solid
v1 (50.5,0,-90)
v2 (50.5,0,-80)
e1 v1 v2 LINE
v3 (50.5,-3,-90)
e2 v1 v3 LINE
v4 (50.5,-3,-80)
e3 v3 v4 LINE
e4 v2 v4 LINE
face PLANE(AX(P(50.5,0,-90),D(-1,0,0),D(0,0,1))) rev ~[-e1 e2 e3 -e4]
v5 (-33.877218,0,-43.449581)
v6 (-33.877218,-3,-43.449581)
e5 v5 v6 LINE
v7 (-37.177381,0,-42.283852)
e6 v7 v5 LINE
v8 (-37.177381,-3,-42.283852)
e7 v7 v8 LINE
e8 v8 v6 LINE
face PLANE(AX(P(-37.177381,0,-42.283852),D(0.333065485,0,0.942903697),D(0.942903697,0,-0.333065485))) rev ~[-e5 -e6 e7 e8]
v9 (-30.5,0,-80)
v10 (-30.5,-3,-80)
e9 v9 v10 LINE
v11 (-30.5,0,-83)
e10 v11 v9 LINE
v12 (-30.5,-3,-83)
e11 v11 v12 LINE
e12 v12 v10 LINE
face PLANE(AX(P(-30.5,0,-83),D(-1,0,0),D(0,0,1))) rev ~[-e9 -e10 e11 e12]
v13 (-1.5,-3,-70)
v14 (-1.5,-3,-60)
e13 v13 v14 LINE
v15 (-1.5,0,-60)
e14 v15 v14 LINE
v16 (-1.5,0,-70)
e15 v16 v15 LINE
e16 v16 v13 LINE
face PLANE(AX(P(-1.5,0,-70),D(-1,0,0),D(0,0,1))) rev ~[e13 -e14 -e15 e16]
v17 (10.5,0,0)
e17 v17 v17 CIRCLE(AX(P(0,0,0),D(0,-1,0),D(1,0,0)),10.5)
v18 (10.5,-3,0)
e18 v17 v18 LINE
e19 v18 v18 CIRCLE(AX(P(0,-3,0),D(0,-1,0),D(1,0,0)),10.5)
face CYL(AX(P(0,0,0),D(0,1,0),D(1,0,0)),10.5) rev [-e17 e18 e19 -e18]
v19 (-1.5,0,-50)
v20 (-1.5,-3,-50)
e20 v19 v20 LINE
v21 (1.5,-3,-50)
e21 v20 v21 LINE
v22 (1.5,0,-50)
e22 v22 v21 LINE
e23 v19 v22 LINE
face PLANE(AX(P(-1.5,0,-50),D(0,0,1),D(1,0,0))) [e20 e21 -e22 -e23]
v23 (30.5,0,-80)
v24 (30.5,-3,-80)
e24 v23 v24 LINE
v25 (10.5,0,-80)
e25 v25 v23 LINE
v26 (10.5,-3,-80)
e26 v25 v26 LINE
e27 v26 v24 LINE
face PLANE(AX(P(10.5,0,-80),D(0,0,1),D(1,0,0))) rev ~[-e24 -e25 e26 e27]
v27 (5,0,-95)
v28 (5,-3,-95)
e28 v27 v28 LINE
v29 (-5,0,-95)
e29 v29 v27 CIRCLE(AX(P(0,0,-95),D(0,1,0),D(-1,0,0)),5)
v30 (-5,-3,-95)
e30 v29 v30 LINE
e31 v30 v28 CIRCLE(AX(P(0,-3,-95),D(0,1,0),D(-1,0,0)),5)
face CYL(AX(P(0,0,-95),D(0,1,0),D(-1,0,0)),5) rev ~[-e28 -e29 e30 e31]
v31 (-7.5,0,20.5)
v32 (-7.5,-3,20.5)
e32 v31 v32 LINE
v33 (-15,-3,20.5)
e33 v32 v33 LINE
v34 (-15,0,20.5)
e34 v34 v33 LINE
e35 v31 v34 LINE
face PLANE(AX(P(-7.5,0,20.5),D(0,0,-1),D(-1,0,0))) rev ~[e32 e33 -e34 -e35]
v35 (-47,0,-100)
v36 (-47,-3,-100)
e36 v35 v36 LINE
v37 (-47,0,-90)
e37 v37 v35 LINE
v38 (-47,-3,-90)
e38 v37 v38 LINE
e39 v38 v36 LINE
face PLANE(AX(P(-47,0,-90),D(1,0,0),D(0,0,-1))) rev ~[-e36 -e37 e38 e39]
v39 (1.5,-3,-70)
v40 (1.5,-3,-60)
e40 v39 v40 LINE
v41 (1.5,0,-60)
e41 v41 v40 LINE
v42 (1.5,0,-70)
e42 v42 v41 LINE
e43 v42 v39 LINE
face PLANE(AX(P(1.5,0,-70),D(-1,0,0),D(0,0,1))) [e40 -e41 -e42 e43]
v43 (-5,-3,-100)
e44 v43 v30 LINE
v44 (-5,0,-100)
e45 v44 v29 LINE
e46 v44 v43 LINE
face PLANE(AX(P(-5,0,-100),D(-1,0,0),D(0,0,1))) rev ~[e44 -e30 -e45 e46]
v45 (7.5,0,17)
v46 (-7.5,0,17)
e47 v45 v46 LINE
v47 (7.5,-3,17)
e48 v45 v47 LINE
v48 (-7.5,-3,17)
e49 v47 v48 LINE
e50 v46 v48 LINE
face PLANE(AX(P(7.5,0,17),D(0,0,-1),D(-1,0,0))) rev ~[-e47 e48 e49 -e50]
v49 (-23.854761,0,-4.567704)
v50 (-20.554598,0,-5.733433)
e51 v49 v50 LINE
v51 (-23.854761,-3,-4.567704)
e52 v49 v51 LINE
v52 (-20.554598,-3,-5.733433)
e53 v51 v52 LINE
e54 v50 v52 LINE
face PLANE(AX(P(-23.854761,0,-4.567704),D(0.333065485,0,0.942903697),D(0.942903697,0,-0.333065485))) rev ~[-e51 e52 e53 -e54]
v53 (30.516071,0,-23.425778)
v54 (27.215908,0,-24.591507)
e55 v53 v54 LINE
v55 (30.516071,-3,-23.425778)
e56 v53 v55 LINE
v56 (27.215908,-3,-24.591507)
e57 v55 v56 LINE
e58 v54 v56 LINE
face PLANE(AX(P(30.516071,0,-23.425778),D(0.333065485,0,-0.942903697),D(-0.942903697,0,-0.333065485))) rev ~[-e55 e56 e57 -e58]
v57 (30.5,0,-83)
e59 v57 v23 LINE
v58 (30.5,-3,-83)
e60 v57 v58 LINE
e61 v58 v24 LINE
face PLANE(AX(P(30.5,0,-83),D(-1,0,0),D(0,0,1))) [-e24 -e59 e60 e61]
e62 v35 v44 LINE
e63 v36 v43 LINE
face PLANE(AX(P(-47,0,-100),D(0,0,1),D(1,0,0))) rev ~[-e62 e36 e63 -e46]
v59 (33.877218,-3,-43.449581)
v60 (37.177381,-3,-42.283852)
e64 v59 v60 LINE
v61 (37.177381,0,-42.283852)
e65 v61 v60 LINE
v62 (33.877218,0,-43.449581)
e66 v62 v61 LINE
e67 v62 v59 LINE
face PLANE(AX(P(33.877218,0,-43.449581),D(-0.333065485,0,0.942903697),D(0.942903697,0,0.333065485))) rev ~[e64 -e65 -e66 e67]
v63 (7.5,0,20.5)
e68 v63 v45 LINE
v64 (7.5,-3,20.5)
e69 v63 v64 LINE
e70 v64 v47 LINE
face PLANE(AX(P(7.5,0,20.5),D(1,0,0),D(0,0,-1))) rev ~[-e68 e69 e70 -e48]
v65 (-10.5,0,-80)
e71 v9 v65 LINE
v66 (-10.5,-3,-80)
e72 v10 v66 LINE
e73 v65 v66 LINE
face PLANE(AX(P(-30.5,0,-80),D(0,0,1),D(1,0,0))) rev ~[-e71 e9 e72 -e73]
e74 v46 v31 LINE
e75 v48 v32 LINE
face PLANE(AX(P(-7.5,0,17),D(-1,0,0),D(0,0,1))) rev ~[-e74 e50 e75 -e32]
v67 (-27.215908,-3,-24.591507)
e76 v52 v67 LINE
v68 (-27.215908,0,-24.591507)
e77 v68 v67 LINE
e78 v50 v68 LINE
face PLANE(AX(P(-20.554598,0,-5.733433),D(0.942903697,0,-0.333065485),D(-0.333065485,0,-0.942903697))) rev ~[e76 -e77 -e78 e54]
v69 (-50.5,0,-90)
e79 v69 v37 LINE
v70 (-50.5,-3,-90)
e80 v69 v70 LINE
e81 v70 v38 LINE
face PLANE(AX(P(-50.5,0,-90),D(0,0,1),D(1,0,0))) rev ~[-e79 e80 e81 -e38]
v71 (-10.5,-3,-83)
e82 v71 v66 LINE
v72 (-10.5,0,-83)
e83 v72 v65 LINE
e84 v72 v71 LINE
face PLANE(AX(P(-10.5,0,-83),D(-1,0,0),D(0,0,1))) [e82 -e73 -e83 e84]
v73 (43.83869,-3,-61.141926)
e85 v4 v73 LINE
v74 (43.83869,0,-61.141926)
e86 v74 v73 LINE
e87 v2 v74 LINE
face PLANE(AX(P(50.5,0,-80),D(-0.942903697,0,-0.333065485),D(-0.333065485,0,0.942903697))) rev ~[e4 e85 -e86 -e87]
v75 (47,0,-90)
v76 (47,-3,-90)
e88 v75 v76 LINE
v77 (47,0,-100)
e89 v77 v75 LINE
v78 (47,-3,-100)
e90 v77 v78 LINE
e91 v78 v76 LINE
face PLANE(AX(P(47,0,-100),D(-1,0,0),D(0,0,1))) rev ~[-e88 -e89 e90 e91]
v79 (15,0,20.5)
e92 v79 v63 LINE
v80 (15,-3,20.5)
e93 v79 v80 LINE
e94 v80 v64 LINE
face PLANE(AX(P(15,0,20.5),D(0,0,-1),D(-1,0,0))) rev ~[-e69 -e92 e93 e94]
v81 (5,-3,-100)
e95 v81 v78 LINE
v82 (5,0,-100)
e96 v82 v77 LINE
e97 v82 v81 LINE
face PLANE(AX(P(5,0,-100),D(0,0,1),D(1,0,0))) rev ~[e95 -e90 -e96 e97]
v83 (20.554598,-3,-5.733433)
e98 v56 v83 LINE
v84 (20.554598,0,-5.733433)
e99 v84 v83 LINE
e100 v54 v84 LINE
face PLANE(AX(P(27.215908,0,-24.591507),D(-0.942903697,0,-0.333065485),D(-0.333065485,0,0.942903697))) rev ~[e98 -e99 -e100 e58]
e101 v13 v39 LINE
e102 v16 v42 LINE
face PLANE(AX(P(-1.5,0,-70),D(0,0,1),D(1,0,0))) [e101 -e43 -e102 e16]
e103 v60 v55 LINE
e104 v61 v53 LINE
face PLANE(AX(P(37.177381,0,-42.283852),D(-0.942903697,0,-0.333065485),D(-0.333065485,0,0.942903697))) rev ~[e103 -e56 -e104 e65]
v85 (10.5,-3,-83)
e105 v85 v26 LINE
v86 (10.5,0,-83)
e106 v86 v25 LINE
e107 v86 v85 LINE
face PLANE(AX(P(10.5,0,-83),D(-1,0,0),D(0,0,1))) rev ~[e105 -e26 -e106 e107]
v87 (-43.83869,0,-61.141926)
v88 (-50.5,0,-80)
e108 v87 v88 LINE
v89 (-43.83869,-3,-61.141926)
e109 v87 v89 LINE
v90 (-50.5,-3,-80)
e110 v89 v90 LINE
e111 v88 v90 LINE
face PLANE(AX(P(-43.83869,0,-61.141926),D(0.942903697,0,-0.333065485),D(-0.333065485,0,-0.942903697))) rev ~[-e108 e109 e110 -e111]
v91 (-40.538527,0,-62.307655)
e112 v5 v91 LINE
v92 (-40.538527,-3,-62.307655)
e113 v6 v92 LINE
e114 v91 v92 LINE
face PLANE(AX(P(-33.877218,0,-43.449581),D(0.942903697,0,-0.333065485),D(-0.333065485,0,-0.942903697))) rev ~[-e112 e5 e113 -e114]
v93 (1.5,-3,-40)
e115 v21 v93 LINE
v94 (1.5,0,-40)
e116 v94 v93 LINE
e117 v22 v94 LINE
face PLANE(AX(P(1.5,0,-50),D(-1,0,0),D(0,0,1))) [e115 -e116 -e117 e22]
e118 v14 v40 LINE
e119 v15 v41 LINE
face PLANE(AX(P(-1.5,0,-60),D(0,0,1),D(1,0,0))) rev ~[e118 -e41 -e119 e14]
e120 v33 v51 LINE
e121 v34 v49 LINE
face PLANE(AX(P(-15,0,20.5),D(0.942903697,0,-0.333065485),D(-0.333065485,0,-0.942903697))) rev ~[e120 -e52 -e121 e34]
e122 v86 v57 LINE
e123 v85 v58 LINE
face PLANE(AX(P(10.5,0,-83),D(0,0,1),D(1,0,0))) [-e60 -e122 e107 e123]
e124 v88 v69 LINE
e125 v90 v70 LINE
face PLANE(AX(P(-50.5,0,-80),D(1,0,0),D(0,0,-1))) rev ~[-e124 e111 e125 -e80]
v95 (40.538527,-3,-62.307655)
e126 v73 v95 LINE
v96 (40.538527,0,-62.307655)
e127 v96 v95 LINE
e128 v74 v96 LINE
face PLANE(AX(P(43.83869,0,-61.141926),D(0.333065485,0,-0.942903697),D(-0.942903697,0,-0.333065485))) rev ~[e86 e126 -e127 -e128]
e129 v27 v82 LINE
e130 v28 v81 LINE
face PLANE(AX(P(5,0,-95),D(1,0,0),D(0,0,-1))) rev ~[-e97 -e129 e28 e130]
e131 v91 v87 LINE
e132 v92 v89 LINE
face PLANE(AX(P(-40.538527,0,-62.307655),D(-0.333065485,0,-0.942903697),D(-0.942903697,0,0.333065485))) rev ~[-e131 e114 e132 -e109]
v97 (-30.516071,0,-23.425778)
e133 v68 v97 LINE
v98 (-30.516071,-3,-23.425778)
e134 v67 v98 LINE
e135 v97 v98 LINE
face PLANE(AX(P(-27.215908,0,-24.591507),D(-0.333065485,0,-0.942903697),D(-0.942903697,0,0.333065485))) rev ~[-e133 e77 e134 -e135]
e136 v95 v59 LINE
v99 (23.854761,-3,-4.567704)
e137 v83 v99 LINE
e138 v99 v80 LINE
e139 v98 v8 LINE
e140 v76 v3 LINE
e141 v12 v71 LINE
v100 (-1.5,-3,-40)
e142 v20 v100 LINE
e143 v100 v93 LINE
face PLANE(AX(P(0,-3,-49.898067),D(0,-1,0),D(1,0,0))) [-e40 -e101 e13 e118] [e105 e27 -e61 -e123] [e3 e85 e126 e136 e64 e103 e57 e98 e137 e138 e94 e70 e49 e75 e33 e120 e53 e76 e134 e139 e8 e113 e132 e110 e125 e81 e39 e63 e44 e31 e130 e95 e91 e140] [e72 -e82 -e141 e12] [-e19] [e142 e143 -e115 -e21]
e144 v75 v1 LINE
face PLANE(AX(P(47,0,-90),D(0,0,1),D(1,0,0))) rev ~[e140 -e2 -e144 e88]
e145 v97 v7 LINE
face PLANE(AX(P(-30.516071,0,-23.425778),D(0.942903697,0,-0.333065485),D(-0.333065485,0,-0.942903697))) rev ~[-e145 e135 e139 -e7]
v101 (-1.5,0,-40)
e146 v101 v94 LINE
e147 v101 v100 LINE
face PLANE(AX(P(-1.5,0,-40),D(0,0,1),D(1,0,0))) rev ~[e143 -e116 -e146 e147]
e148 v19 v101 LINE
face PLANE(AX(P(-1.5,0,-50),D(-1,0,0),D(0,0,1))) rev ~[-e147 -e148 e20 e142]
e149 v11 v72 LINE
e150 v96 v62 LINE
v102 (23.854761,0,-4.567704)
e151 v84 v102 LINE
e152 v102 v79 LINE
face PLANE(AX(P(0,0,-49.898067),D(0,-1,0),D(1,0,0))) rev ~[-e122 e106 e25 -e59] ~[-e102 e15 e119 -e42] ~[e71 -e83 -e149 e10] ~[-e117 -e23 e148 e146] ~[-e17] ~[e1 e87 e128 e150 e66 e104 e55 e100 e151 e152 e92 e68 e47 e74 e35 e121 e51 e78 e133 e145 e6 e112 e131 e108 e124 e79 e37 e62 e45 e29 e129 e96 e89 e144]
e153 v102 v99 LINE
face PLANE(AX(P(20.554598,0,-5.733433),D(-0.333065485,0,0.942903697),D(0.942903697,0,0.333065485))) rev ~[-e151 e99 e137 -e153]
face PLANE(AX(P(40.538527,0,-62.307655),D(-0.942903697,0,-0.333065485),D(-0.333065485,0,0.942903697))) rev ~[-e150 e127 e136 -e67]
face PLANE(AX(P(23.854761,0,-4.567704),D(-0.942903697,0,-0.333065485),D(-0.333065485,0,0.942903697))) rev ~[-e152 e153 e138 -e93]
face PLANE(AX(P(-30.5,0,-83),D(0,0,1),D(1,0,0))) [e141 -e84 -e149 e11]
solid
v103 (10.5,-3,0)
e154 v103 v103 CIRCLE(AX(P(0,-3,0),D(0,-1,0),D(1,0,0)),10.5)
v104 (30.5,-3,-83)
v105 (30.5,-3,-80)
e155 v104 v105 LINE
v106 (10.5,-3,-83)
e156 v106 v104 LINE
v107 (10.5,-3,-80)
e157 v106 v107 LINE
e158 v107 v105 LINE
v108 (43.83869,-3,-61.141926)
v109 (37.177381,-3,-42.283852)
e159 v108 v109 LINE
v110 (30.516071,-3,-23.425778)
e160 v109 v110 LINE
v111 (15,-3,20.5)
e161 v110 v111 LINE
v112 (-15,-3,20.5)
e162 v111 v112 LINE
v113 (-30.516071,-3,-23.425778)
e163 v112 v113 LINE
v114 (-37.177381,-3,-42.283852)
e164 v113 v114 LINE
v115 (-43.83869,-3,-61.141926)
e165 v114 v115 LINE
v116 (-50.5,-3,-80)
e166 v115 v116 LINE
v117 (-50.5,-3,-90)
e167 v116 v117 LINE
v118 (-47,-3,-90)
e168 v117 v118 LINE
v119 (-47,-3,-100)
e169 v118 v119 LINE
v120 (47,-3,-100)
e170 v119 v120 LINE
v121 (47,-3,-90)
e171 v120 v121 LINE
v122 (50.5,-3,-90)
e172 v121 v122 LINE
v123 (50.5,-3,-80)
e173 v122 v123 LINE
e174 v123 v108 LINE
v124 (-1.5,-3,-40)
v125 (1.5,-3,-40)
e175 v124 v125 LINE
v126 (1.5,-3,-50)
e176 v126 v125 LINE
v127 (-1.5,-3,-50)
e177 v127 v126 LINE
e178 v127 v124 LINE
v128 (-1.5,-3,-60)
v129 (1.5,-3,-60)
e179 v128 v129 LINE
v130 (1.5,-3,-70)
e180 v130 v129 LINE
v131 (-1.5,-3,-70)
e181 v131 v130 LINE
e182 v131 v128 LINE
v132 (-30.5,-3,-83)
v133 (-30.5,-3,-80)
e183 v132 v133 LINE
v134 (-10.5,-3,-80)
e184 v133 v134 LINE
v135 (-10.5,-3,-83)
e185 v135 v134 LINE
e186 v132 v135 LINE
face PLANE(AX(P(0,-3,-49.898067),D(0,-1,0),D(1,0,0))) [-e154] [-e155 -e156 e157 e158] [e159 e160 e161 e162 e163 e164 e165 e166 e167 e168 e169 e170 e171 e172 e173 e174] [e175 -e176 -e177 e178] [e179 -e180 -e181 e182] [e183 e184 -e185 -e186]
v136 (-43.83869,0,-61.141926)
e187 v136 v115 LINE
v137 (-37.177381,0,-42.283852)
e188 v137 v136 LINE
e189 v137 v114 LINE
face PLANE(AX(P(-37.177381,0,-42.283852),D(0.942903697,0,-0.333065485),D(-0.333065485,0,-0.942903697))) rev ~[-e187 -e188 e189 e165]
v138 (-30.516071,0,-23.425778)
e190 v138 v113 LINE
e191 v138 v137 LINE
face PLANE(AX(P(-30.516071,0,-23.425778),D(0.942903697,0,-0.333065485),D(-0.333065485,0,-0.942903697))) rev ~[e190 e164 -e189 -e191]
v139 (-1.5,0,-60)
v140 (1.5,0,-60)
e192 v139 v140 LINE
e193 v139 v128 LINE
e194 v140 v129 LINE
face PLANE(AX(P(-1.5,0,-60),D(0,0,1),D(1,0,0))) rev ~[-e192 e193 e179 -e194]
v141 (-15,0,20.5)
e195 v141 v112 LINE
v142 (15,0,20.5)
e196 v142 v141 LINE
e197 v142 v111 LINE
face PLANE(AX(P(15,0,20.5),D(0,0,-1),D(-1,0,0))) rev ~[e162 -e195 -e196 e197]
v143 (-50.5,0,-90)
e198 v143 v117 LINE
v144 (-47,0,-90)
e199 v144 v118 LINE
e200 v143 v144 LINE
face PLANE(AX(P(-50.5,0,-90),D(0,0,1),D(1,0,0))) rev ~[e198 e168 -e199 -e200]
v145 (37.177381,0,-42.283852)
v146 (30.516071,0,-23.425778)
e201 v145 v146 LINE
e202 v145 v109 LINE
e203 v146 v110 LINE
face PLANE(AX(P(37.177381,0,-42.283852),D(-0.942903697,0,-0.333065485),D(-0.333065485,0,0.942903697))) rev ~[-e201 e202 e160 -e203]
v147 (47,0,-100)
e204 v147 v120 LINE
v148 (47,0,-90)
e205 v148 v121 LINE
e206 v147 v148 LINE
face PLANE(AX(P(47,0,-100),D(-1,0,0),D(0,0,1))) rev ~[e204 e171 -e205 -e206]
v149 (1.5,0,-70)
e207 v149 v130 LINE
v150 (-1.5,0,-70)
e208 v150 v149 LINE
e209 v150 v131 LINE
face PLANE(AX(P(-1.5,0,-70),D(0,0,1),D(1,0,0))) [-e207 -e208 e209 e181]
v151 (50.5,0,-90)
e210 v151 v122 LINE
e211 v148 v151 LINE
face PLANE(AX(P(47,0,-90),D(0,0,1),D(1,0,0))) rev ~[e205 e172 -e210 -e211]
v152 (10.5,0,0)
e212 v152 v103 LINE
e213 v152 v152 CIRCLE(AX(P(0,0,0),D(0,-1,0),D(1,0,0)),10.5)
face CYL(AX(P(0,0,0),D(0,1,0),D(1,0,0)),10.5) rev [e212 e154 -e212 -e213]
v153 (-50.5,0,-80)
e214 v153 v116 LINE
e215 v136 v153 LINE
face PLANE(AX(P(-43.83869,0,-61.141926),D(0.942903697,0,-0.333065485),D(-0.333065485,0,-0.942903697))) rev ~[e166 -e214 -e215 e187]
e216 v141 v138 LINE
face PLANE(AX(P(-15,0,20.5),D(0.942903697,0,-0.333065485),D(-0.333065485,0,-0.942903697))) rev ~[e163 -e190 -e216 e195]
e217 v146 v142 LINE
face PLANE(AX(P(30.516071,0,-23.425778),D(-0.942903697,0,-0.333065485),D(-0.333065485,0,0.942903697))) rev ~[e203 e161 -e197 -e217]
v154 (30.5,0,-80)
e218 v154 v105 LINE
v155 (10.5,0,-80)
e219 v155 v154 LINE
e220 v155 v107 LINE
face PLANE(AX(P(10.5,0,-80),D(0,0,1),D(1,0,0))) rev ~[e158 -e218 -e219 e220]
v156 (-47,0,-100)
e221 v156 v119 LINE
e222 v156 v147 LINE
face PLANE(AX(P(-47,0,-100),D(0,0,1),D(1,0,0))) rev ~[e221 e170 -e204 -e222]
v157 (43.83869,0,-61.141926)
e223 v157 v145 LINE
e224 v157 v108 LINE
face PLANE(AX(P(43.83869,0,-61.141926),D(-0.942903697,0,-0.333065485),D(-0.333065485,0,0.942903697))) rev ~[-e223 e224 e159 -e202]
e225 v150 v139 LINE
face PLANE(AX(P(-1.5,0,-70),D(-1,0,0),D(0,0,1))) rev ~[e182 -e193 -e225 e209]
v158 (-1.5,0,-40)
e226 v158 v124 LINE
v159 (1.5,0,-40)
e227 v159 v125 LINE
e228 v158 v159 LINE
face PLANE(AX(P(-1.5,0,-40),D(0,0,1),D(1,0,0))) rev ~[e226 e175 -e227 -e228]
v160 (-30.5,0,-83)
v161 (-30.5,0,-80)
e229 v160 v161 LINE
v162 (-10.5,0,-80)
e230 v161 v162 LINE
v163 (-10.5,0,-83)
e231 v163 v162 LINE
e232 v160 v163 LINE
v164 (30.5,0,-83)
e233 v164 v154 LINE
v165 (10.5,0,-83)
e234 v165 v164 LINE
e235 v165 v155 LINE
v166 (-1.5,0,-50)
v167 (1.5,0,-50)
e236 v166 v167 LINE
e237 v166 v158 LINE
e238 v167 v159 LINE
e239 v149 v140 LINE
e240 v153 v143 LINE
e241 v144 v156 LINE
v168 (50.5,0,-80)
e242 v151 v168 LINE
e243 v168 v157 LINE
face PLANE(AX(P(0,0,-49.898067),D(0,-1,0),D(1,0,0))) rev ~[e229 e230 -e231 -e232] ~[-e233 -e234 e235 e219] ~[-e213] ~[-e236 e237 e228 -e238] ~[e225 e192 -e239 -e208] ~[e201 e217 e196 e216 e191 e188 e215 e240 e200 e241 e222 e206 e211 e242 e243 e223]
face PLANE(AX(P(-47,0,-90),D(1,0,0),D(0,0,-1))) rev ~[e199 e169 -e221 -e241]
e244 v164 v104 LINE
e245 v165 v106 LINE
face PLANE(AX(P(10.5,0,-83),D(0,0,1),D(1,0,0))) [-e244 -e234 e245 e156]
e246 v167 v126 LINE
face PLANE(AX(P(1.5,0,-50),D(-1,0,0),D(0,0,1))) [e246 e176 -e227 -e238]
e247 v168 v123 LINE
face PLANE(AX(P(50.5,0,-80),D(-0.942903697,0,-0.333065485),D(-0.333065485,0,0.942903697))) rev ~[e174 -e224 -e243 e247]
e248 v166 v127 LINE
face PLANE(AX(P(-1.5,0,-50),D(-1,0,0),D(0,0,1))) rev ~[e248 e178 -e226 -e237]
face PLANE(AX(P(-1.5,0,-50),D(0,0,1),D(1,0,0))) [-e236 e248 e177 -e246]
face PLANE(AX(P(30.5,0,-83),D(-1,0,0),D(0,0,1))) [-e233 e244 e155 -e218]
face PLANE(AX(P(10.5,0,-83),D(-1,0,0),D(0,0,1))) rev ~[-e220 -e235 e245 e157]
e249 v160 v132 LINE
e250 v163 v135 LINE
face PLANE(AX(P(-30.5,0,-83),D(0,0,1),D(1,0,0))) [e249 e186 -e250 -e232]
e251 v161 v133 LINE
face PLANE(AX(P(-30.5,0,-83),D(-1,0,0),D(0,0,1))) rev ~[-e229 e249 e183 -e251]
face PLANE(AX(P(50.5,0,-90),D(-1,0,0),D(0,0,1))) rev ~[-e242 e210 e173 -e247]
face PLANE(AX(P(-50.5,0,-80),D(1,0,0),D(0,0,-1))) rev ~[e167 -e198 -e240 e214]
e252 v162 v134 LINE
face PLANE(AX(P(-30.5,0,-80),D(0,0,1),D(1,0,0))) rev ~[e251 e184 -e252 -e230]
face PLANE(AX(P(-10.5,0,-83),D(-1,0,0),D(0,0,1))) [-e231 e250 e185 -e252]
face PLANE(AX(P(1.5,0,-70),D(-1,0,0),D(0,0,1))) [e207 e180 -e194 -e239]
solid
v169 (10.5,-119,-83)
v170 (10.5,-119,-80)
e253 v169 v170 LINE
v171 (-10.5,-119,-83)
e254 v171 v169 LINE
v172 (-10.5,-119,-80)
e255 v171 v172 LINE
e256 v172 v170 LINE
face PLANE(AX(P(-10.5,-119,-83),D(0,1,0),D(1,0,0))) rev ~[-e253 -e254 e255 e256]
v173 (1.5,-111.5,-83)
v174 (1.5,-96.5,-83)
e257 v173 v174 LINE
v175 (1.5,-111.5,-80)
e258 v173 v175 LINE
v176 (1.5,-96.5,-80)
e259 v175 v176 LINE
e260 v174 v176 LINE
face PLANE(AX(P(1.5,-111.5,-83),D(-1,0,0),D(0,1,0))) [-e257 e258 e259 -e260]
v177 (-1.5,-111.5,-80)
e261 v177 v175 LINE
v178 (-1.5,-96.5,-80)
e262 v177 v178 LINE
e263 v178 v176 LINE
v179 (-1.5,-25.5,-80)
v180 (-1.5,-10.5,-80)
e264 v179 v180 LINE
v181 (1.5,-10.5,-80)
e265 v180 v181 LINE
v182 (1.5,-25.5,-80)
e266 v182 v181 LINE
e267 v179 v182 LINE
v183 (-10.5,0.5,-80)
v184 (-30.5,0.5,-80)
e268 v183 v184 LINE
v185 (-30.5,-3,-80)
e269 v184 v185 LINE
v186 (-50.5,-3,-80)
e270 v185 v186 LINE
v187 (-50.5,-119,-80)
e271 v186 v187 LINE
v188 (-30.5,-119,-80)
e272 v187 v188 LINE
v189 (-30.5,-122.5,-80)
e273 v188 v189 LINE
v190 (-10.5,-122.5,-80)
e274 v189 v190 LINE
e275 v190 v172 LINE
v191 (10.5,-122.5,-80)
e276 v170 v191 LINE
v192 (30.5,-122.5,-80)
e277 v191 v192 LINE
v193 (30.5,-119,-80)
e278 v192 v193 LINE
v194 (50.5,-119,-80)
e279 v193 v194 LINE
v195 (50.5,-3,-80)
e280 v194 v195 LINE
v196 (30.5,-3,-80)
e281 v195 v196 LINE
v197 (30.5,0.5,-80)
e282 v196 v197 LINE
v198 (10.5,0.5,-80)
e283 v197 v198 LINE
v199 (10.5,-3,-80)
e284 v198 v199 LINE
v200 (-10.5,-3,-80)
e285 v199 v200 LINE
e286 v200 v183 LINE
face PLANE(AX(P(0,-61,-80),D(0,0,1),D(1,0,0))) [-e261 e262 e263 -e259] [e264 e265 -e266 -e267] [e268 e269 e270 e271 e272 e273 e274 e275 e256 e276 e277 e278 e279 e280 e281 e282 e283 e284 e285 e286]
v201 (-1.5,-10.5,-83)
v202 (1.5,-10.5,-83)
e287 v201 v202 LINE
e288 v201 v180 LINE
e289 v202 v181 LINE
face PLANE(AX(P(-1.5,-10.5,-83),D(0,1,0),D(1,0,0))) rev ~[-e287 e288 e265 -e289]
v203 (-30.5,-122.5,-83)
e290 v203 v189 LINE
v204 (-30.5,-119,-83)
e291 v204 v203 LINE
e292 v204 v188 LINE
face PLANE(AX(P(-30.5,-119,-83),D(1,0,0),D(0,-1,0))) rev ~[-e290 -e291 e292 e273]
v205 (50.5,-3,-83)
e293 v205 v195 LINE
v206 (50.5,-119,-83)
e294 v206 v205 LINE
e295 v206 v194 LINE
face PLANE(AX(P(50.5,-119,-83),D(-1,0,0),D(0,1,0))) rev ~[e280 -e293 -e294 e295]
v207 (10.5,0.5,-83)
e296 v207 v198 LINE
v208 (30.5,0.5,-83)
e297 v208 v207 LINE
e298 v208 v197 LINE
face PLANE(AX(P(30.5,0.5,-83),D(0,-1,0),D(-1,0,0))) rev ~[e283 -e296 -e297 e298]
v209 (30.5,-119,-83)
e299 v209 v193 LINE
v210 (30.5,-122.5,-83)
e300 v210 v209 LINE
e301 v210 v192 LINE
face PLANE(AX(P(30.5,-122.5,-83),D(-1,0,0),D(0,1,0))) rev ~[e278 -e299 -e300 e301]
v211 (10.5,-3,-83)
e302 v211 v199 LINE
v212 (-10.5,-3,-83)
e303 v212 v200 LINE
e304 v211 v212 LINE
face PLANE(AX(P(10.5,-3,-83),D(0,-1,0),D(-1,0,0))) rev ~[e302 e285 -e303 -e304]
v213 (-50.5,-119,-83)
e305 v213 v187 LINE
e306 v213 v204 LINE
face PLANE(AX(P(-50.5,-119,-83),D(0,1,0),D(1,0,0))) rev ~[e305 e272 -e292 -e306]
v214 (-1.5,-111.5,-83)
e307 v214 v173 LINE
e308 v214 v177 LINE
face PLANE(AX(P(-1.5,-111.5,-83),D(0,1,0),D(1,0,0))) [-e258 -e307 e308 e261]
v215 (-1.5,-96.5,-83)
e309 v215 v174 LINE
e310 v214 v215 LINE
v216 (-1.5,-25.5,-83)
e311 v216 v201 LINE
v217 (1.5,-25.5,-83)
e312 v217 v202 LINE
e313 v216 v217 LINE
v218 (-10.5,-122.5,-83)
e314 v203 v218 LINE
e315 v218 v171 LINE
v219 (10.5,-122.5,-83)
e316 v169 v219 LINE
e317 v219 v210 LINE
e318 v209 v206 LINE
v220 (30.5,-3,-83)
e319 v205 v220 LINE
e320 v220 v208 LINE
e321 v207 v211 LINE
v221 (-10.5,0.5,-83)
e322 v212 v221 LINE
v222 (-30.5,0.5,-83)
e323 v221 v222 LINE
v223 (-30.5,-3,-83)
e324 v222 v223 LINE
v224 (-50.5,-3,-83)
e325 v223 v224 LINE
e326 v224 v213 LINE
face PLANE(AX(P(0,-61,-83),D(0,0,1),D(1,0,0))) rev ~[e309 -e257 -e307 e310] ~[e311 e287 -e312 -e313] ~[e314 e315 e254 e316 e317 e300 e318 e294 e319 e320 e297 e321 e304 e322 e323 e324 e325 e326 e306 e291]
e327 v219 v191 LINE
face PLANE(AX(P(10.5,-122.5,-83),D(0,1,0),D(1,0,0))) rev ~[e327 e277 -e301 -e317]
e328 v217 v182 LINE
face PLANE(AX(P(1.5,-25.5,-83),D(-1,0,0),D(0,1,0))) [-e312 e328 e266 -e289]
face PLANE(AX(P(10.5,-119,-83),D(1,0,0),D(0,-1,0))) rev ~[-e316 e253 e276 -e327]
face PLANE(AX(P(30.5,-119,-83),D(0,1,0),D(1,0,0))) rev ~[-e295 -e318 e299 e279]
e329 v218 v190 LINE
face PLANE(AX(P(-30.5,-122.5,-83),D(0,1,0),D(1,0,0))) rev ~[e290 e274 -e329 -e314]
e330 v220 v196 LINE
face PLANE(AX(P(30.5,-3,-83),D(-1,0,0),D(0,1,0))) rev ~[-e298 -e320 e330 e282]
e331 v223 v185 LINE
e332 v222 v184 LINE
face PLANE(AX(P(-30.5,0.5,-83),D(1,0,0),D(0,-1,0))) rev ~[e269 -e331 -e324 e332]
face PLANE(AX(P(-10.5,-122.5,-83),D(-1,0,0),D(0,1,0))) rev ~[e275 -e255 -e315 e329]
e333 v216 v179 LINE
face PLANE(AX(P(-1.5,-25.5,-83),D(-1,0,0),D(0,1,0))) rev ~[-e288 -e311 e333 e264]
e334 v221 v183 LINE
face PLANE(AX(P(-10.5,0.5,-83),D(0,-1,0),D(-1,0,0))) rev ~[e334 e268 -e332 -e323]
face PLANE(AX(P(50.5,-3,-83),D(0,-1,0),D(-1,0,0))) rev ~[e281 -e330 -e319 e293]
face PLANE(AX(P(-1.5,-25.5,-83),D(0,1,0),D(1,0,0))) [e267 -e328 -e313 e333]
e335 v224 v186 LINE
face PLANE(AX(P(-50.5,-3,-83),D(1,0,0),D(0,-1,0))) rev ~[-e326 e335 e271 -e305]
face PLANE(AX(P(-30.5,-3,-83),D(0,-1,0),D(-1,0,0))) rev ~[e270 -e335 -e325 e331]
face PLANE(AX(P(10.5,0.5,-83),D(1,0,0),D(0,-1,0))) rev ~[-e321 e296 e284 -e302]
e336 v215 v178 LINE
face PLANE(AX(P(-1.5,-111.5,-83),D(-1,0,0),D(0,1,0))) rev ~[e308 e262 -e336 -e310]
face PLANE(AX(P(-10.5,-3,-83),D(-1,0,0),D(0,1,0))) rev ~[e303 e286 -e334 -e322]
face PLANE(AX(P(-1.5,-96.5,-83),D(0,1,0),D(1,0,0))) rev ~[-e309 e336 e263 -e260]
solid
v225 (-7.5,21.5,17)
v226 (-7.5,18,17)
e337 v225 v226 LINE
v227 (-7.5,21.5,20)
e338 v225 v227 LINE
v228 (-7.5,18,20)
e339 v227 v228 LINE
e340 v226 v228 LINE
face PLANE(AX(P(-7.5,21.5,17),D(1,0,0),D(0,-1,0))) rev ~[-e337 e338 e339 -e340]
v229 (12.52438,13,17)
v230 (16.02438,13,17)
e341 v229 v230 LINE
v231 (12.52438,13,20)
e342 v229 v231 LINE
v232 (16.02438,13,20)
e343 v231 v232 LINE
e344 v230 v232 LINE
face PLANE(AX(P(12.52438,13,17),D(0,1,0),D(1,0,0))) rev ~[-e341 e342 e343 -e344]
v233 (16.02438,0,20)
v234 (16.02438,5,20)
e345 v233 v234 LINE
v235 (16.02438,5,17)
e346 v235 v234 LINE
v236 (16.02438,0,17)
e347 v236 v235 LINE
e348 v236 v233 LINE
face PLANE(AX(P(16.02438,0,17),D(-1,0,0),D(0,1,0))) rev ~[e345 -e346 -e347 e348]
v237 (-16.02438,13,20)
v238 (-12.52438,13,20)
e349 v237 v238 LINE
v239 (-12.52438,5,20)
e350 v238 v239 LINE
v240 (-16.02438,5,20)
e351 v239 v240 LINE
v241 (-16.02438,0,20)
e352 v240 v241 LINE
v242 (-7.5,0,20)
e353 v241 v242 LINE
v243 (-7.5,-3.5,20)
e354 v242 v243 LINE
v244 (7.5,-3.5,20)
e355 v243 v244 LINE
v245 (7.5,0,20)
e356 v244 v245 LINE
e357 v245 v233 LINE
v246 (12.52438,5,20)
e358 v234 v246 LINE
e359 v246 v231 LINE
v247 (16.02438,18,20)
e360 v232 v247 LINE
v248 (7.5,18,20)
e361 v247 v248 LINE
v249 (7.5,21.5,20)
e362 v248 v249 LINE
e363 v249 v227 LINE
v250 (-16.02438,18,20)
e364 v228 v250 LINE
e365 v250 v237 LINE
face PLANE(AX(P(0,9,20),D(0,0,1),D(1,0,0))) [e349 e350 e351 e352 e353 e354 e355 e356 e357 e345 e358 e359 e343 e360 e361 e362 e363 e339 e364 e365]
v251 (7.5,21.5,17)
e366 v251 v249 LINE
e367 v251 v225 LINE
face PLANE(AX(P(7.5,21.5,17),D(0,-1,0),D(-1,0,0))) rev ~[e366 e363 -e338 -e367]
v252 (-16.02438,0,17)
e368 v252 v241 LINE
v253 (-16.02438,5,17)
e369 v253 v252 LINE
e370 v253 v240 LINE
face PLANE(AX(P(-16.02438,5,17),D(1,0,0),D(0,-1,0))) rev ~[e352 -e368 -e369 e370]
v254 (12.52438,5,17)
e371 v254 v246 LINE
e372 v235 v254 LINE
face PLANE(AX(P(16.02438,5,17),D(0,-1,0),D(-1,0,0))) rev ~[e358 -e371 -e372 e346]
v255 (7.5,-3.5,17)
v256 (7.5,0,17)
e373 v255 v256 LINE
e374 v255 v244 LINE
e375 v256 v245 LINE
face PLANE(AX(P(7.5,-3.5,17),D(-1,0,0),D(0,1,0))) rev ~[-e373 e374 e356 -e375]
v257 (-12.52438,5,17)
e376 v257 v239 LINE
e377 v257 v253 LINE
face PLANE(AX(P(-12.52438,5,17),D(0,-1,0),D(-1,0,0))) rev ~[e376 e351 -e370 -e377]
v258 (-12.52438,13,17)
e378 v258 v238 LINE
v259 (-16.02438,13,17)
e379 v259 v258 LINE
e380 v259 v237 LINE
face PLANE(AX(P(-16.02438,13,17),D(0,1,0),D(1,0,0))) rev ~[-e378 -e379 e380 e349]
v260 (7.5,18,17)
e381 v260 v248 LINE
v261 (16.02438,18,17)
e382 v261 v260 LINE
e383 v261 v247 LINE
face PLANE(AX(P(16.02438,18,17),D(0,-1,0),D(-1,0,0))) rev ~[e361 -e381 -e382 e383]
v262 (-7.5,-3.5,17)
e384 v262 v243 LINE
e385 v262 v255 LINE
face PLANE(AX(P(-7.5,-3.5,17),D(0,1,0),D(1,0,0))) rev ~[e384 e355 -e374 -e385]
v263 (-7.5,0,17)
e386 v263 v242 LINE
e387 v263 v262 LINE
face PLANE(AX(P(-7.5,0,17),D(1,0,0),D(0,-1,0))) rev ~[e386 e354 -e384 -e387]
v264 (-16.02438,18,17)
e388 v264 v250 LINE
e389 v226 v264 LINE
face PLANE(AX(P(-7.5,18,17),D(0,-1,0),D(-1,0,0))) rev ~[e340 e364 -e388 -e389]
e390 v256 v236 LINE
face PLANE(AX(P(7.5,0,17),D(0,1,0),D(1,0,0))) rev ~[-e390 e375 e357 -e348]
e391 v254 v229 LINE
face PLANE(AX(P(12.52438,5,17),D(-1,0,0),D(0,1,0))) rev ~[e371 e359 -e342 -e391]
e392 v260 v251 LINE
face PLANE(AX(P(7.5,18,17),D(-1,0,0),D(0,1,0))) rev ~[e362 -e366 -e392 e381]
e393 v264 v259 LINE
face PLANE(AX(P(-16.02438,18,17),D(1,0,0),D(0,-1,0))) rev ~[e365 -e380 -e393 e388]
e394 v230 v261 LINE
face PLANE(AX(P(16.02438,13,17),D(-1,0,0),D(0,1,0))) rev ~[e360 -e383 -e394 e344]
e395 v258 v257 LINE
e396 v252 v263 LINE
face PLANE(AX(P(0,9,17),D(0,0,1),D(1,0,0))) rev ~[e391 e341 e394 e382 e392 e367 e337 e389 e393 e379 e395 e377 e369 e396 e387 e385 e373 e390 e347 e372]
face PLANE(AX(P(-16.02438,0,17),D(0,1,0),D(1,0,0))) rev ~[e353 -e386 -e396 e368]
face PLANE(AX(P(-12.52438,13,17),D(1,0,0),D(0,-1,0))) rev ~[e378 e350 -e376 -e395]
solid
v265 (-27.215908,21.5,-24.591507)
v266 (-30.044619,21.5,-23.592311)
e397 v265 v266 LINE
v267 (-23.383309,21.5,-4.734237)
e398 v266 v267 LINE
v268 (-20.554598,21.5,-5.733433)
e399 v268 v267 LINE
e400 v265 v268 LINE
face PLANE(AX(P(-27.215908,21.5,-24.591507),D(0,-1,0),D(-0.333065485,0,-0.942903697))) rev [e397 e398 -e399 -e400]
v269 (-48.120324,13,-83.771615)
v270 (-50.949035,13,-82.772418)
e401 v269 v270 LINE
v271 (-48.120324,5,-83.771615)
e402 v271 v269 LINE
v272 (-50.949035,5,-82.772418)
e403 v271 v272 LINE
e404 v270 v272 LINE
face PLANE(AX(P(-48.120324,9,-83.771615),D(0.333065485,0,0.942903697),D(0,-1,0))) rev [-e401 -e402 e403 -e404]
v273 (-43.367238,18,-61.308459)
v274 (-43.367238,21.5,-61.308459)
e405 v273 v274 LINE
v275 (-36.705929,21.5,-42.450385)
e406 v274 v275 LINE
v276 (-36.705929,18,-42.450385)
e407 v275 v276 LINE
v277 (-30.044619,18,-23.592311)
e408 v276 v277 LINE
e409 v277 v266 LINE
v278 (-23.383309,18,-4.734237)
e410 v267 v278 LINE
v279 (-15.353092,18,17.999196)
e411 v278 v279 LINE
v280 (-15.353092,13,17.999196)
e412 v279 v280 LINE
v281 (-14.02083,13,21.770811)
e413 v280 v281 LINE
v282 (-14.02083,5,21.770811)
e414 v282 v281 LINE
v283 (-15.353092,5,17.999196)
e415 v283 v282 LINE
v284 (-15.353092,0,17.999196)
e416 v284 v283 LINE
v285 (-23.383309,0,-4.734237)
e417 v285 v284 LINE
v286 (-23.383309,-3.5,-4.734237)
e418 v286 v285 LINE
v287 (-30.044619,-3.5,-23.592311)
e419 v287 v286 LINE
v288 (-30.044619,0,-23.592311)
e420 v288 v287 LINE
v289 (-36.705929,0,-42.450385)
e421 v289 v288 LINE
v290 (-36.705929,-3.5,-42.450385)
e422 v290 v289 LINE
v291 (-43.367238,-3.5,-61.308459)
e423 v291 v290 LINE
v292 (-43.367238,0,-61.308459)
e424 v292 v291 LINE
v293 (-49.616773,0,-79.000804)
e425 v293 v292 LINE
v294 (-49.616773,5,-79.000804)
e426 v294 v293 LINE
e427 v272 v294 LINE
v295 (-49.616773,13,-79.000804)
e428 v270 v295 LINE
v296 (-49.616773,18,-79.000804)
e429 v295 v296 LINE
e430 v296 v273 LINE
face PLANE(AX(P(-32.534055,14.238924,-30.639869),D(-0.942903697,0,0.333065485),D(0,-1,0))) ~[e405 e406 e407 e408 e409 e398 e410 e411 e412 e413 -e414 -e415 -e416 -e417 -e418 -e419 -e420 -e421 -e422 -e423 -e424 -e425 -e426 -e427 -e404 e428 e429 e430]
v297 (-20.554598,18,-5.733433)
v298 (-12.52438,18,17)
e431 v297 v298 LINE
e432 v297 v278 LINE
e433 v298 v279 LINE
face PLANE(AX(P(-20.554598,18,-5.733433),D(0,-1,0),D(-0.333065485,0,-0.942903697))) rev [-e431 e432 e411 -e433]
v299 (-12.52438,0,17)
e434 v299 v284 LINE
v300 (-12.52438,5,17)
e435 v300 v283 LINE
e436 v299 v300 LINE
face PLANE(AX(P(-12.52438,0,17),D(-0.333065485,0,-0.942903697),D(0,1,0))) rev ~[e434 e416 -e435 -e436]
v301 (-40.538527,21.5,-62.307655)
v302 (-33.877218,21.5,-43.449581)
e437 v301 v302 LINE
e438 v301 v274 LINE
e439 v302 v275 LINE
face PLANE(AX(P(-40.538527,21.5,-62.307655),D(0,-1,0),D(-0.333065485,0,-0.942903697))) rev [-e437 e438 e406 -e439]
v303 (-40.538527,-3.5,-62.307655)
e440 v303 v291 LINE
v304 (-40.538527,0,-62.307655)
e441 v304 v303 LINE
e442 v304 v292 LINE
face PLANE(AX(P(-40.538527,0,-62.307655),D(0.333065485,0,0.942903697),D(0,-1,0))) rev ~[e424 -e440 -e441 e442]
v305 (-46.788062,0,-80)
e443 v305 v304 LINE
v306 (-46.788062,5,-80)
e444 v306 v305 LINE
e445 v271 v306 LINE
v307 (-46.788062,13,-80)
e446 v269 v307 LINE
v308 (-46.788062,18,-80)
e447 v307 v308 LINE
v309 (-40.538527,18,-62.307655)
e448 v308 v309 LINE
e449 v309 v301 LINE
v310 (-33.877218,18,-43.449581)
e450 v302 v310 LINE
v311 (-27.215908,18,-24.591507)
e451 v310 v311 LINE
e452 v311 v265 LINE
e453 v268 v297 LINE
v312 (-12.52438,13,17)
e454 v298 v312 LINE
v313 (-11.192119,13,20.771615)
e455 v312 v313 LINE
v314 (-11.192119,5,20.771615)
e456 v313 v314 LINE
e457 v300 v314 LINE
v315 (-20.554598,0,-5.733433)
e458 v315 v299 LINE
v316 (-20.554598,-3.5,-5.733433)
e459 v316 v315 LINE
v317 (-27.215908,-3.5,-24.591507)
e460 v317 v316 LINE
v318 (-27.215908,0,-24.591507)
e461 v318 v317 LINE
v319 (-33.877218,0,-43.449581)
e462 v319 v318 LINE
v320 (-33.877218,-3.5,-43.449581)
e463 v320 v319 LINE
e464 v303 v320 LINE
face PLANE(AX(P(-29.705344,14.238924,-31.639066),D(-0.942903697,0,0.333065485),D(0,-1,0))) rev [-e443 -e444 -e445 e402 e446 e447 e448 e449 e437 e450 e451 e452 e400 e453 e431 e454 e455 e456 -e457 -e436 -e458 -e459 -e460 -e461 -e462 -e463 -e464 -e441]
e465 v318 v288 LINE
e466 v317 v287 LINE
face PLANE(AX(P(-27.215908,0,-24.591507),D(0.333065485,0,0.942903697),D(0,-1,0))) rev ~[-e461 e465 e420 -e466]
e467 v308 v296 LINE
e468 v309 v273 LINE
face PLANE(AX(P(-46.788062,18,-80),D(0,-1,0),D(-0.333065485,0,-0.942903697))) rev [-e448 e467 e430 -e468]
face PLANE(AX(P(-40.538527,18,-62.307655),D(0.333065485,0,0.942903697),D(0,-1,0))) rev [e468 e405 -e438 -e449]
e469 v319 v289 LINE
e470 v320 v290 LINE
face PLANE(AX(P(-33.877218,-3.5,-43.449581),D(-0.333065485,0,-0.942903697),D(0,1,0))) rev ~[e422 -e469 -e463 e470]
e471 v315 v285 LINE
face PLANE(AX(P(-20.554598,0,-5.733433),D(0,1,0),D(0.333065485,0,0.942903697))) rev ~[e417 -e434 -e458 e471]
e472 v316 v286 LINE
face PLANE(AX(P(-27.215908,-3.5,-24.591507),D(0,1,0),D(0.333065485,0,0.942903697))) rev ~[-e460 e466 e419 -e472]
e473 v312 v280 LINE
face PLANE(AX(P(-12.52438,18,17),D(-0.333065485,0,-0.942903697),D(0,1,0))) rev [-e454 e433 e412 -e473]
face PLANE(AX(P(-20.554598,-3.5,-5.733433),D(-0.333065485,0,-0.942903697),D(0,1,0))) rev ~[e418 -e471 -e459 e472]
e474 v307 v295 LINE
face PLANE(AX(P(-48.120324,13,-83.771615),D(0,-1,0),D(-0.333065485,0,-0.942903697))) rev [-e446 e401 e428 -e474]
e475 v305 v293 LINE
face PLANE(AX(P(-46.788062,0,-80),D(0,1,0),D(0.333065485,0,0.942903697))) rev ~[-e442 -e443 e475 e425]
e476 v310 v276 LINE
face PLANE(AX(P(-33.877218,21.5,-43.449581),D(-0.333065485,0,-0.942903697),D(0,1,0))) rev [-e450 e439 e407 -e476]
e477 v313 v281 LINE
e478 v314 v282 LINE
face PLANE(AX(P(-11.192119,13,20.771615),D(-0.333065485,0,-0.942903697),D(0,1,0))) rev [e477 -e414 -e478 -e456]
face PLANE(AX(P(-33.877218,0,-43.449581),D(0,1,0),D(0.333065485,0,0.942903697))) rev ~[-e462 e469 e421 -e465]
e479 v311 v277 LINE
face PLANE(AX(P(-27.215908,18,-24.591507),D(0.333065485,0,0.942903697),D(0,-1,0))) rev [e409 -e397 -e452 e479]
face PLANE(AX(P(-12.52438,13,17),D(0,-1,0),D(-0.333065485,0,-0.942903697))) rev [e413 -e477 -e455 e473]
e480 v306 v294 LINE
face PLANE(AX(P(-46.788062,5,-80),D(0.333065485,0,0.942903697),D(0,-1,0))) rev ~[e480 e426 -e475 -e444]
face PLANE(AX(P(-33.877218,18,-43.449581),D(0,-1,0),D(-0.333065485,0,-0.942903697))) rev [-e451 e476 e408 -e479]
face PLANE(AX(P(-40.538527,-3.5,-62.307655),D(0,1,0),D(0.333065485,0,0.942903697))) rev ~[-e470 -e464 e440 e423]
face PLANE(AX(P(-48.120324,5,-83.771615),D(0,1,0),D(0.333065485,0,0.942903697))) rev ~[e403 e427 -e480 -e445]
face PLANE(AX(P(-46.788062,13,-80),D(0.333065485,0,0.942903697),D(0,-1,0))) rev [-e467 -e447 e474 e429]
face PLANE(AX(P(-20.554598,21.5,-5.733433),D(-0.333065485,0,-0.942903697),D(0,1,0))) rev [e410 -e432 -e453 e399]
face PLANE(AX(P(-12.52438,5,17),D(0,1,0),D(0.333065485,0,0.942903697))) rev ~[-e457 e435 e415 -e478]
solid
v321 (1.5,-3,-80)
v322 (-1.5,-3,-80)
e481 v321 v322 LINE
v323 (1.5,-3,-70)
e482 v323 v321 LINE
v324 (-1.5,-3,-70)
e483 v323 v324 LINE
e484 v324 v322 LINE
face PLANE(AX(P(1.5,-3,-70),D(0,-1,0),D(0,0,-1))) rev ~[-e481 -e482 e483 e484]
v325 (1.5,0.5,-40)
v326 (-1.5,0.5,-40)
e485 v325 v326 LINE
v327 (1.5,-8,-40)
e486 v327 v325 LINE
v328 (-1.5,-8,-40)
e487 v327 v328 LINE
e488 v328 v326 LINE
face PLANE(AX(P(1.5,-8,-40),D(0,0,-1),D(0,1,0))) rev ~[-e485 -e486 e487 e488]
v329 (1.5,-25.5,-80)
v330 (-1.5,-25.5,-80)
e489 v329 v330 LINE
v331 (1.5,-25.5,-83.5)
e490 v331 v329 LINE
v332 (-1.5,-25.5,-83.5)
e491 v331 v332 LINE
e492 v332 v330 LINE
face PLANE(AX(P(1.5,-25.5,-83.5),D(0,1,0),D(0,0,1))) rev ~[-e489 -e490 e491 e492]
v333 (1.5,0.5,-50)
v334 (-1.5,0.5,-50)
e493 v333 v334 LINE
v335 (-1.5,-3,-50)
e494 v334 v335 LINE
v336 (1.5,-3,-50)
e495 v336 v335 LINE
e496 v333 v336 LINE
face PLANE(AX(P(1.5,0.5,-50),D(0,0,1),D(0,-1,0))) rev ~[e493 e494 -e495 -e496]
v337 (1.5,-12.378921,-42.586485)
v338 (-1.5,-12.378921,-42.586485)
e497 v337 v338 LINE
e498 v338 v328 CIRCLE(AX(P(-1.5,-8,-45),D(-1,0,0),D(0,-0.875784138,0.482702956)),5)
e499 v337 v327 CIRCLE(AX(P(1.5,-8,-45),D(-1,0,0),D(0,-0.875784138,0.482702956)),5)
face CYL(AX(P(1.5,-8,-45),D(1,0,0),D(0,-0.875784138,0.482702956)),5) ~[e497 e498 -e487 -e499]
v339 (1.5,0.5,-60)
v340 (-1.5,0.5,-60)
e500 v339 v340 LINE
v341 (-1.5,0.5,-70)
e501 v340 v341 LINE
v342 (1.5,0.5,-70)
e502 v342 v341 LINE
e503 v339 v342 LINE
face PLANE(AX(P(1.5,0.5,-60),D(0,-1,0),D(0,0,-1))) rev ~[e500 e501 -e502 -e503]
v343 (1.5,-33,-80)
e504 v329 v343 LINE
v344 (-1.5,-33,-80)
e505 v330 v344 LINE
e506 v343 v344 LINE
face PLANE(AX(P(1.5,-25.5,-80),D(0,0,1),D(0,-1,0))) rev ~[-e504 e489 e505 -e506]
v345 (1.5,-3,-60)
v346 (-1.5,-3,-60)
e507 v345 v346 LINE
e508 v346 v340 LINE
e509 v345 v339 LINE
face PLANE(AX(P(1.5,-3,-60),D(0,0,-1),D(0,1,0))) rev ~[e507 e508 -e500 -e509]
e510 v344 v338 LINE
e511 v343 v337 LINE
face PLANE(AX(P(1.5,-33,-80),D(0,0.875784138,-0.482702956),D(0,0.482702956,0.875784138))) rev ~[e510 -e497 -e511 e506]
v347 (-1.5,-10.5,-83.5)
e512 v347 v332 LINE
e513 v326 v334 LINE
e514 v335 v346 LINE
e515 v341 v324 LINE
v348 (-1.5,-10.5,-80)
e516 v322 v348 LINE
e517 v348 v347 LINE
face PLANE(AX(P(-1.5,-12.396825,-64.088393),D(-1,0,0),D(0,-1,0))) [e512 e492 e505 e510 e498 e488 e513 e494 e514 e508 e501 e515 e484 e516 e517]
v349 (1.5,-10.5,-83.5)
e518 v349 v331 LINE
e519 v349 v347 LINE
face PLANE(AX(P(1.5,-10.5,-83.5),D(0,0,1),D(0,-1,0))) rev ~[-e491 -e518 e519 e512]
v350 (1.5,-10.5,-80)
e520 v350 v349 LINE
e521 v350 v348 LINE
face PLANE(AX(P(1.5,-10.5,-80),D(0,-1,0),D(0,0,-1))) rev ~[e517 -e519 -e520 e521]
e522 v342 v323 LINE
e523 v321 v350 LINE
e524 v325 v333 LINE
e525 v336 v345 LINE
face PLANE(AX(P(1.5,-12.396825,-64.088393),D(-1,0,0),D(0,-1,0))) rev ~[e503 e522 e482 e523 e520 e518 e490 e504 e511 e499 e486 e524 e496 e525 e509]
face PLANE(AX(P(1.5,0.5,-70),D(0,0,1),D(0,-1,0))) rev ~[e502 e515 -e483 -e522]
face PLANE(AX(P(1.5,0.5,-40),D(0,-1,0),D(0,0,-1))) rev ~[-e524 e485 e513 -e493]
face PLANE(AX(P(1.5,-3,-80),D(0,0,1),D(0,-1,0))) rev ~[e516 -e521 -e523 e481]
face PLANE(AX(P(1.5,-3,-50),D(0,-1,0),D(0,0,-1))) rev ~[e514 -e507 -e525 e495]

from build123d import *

# Parameters (mm, degrees)
F0_W      = 20
F0_H      = 3
F0_W_2    = 3
F0_H_2    = 10
F0_R      = 10.5
F1_DEPTH  = 3
F0_W_3    = 15
F0_H_3    = 3.5
F2_DEPTH  = 3
F4_DEPTH  = 3
F6_DEPTH  = 3
F8_DEPTH  = 3
F9_W      = 3
F9_H      = 15
F10_DEPTH = 3


# Not quite as in the source:
# - a pattern or mirror of a feature is missing from the dataset's text; its kind, count and spacing are read off the source's solid


with BuildPart() as f1:
    # F0 (on Front) → F1 (new body)
    with BuildSketch(Plane.XZ):
        with BuildLine():
            Line((23.8547611875, -4.5677042069), (15, 20.5))
            Line((15, 20.5), (7.5, 20.5))
            Line((7.5, 20.5), (7.5, 17))
            Line((7.5, 17), (-7.5, 17))
            Line((-7.5, 17), (-7.5, 20.5))
            Line((-7.5, 20.5), (-15, 20.5))
            Line((-15, 20.5), (-23.8547611875, -4.5677042069))
            Line((-23.8547611875, -4.5677042069), (-20.5545982465, -5.7334334049))
            Line((-20.5545982465, -5.7334334049), (-27.2159079497, -24.5915073532))
            Line((-27.2159079497, -24.5915073532), (-30.5160708906, -23.4257781551))
            Line((-30.5160708906, -23.4257781551), (-37.1773805937, -42.2838521034))
            Line((-37.1773805937, -42.2838521034), (-33.8772176528, -43.4495813015))
            Line((-33.8772176528, -43.4495813015), (-40.5385273559, -62.3076552498))
            Line((-40.5385273559, -62.3076552498), (-43.8386902969, -61.1419260517))
            Line((-43.8386902969, -61.1419260517), (-50.5, -80))
            Line((-50.5, -80), (-50.5, -90))
            Line((-50.5, -90), (-47, -90))
            Line((-47, -90), (-47, -100))
            Line((-47, -100), (-5, -100))
            Line((-5, -100), (-5, -95))
            ThreePointArc((-5, -95), (0, -90), (5, -95))
            Line((5, -95), (5, -100))
            Line((5, -100), (47, -100))
            Line((47, -100), (47, -90))
            Line((47, -90), (50.5, -90))
            Line((50.5, -90), (50.5, -80))
            Line((50.5, -80), (43.8386902969, -61.1419260517))
            Line((43.8386902969, -61.1419260517), (40.5385273559, -62.3076552498))
            Line((40.5385273559, -62.3076552498), (33.8772176528, -43.4495813015))
            Line((33.8772176528, -43.4495813015), (37.1773805937, -42.2838521034))
            Line((37.1773805937, -42.2838521034), (30.5160708906, -23.4257781551))
            Line((30.5160708906, -23.4257781551), (27.2159079497, -24.5915073532))
            Line((27.2159079497, -24.5915073532), (20.5545982465, -5.7334334049))
            Line((20.5545982465, -5.7334334049), (23.8547611875, -4.5677042069))
        make_face()
        with Locations((-20.5, -81.5)):
            Rectangle(F0_W, F0_H, mode=Mode.SUBTRACT)
        with Locations((20.5, -81.5)):
            Rectangle(F0_W, F0_H, mode=Mode.SUBTRACT)
        with Locations((0, -65)):
            Rectangle(F0_W_2, F0_H_2, mode=Mode.SUBTRACT)
        with Locations((0, -45)):
            Rectangle(F0_W_2, F0_H_2, mode=Mode.SUBTRACT)
        Circle(F0_R, mode=Mode.SUBTRACT)
    extrude(amount=F1_DEPTH)


with BuildPart() as f2:
    # F0 (on Front) → F2 (new body)
    with BuildSketch(Plane.XZ):
        with BuildLine():
            Line((23.8547611875, -4.5677042069), (15, 20.5))
            Line((15, 20.5), (7.5, 20.5))
            Line((7.5, 20.5), (7.5, 17))
            Line((7.5, 17), (-7.5, 17))
            Line((-7.5, 17), (-7.5, 20.5))
            Line((-7.5, 20.5), (-15, 20.5))
            Line((-15, 20.5), (-23.8547611875, -4.5677042069))
            Line((-23.8547611875, -4.5677042069), (-20.5545982465, -5.7334334049))
            Line((-20.5545982465, -5.7334334049), (-27.2159079497, -24.5915073532))
            Line((-27.2159079497, -24.5915073532), (-30.5160708906, -23.4257781551))
            Line((-30.5160708906, -23.4257781551), (-37.1773805937, -42.2838521034))
            Line((-37.1773805937, -42.2838521034), (-33.8772176528, -43.4495813015))
            Line((-33.8772176528, -43.4495813015), (-40.5385273559, -62.3076552498))
            Line((-40.5385273559, -62.3076552498), (-43.8386902969, -61.1419260517))
            Line((-43.8386902969, -61.1419260517), (-50.5, -80))
            Line((-50.5, -80), (-50.5, -90))
            Line((-50.5, -90), (-47, -90))
            Line((-47, -90), (-47, -100))
            Line((-47, -100), (-5, -100))
            Line((-5, -100), (-5, -95))
            ThreePointArc((-5, -95), (0, -90), (5, -95))
            Line((5, -95), (5, -100))
            Line((5, -100), (47, -100))
            Line((47, -100), (47, -90))
            Line((47, -90), (50.5, -90))
            Line((50.5, -90), (50.5, -80))
            Line((50.5, -80), (43.8386902969, -61.1419260517))
            Line((43.8386902969, -61.1419260517), (40.5385273559, -62.3076552498))
            Line((40.5385273559, -62.3076552498), (33.8772176528, -43.4495813015))
            Line((33.8772176528, -43.4495813015), (37.1773805937, -42.2838521034))
            Line((37.1773805937, -42.2838521034), (30.5160708906, -23.4257781551))
            Line((30.5160708906, -23.4257781551), (27.2159079497, -24.5915073532))
            Line((27.2159079497, -24.5915073532), (20.5545982465, -5.7334334049))
            Line((20.5545982465, -5.7334334049), (23.8547611875, -4.5677042069))
        make_face()
        with Locations((-20.5, -81.5)):
            Rectangle(F0_W, F0_H, mode=Mode.SUBTRACT)
        with Locations((20.5, -81.5)):
            Rectangle(F0_W, F0_H, mode=Mode.SUBTRACT)
        with Locations((0, -65)):
            Rectangle(F0_W_2, F0_H_2, mode=Mode.SUBTRACT)
        with Locations((0, -45)):
            Rectangle(F0_W_2, F0_H_2, mode=Mode.SUBTRACT)
        Circle(F0_R, mode=Mode.SUBTRACT)
        Polygon((30.5160708906, -23.4257781551), (23.8547611875, -4.5677042069), (20.5545982465, -5.7334334049), (27.2159079497, -24.5915073532), align=None)
        with Locations((0, 18.75)):
            Rectangle(F0_W_3, F0_H_3)
        Polygon((43.8386902969, -61.1419260517), (37.1773805937, -42.2838521034), (33.8772176528, -43.4495813015), (40.5385273559, -62.3076552498), align=None)
        Polygon((-20.5545982465, -5.7334334049), (-23.8547611875, -4.5677042069), (-30.5160708906, -23.4257781551), (-27.2159079497, -24.5915073532), align=None)
        Polygon((-33.8772176528, -43.4495813015), (-37.1773805937, -42.2838521034), (-43.8386902969, -61.1419260517), (-40.5385273559, -62.3076552498), align=None)
        with BuildLine():
            Line((-5, -100), (5, -100))
            Line((5, -100), (5, -95))
            ThreePointArc((5, -95), (0, -90), (-5, -95))
            Line((-5, -95), (-5, -100))
        make_face()
    extrude(amount=F2_DEPTH)


with BuildPart() as f4:
    # F3 (on face) → F4 (new body)
    with BuildSketch(Plane(origin=(-16.4738456854, 0, 5.8191196202), x_dir=(0, -1, 0), z_dir=(-0.9429036974, 0, 0.3330654852))):
        Polygon((0, 11.8579239963), (-5, 11.8579239963), (-5, 15.8579239963), (-9, 15.8579239963), (-9, -95.0157843856), (-5, -95.0157843856), (-5, -91.0157843856), (0, -91.0157843856), (0, -72.2521027935), (3.5, -72.2521027935), (3.5, -52.2521027935), (0, -52.2521027935), (0, -32.2521027935), (3.5, -32.2521027935), (3.5, -12.2521027935), (0, -12.2521027935), align=None)
    extrude(amount=F4_DEPTH)

    # F4_copies: F4 across plane


with BuildPart() as f4_1:
    add(f4.part)
    add(f4.part.mirror(Plane.ZX.offset(9)))


with BuildPart() as f6:
    # F5 (on face) → F6 (new body)
    with BuildSketch(Plane.XY.offset(17)):
        Polygon((-16.0243804767, 0), (-7.5, 0), (-7.5, -3.5), (7.5, -3.5), (7.5, 0), (16.0243804767, 0), (16.0243804767, 5), (12.5243804767, 5), (12.5243804767, 13), (16.0243804767, 13), (16.0243804767, 18), (7.5, 18), (7.5, 21.5), (-7.5, 21.5), (-7.5, 18), (-16.0243804767, 18), (-16.0243804767, 13), (-12.5243804767, 13), (-12.5243804767, 5), (-16.0243804767, 5), align=None)
    extrude(amount=F6_DEPTH)


with BuildPart() as f8:
    # F7 (on face) → F8 (new body)
    with BuildSketch(Plane(origin=(1.5, 0, 0), x_dir=(0, -1, 0), z_dir=(-1, 0, 0))):
        with BuildLine():
            ThreePointArc((12.3789206904, -42.5864852212), (10.5428749582, -40.6949115053), (8, -40))
            Line((8, -40), (-0.5, -40))
            Line((-0.5, -40), (-0.5, -50))
            Line((-0.5, -50), (3, -50))
            Line((3, -50), (3, -60))
            Line((3, -60), (-0.5, -60))
            Line((-0.5, -60), (-0.5, -70))
            Line((-0.5, -70), (3, -70))
            Line((3, -70), (3, -80))
            Line((3, -80), (10.5, -80))
            Line((10.5, -80), (10.5, -83.5))
            Line((10.5, -83.5), (25.5, -83.5))
            Line((25.5, -83.5), (25.5, -80))
            Line((25.5, -80), (33, -80))
            Line((33, -80), (12.3789206904, -42.5864852212))
        make_face()
    extrude(amount=F8_DEPTH)


with BuildPart() as f10:
    # F9 (on face) → F10 (new body)
    with BuildSketch(Plane.XY.offset(-83)):
        Polygon((-30.5, -3), (-50.5, -3), (-50.5, -119), (-30.5, -119), (-30.5, -122.5), (-10.5, -122.5), (-10.5, -119), (10.5, -119), (10.5, -122.5), (30.5, -122.5), (30.5, -119), (50.5, -119), (50.5, -3), (30.5, -3), (30.5, 0.5), (10.5, 0.5), (10.5, -3), (-10.5, -3), (-10.5, 0.5), (-30.5, 0.5), align=None)
        with Locations((0, -104)):
            Rectangle(F9_W, F9_H, mode=Mode.SUBTRACT)
        with Locations((0, -18)):
            Rectangle(F9_W, F9_H, mode=Mode.SUBTRACT)
    extrude(amount=F10_DEPTH)


solid = Compound([f1.part, f2.part, f4_1.part, f6.part, f8.part, f10.part])
